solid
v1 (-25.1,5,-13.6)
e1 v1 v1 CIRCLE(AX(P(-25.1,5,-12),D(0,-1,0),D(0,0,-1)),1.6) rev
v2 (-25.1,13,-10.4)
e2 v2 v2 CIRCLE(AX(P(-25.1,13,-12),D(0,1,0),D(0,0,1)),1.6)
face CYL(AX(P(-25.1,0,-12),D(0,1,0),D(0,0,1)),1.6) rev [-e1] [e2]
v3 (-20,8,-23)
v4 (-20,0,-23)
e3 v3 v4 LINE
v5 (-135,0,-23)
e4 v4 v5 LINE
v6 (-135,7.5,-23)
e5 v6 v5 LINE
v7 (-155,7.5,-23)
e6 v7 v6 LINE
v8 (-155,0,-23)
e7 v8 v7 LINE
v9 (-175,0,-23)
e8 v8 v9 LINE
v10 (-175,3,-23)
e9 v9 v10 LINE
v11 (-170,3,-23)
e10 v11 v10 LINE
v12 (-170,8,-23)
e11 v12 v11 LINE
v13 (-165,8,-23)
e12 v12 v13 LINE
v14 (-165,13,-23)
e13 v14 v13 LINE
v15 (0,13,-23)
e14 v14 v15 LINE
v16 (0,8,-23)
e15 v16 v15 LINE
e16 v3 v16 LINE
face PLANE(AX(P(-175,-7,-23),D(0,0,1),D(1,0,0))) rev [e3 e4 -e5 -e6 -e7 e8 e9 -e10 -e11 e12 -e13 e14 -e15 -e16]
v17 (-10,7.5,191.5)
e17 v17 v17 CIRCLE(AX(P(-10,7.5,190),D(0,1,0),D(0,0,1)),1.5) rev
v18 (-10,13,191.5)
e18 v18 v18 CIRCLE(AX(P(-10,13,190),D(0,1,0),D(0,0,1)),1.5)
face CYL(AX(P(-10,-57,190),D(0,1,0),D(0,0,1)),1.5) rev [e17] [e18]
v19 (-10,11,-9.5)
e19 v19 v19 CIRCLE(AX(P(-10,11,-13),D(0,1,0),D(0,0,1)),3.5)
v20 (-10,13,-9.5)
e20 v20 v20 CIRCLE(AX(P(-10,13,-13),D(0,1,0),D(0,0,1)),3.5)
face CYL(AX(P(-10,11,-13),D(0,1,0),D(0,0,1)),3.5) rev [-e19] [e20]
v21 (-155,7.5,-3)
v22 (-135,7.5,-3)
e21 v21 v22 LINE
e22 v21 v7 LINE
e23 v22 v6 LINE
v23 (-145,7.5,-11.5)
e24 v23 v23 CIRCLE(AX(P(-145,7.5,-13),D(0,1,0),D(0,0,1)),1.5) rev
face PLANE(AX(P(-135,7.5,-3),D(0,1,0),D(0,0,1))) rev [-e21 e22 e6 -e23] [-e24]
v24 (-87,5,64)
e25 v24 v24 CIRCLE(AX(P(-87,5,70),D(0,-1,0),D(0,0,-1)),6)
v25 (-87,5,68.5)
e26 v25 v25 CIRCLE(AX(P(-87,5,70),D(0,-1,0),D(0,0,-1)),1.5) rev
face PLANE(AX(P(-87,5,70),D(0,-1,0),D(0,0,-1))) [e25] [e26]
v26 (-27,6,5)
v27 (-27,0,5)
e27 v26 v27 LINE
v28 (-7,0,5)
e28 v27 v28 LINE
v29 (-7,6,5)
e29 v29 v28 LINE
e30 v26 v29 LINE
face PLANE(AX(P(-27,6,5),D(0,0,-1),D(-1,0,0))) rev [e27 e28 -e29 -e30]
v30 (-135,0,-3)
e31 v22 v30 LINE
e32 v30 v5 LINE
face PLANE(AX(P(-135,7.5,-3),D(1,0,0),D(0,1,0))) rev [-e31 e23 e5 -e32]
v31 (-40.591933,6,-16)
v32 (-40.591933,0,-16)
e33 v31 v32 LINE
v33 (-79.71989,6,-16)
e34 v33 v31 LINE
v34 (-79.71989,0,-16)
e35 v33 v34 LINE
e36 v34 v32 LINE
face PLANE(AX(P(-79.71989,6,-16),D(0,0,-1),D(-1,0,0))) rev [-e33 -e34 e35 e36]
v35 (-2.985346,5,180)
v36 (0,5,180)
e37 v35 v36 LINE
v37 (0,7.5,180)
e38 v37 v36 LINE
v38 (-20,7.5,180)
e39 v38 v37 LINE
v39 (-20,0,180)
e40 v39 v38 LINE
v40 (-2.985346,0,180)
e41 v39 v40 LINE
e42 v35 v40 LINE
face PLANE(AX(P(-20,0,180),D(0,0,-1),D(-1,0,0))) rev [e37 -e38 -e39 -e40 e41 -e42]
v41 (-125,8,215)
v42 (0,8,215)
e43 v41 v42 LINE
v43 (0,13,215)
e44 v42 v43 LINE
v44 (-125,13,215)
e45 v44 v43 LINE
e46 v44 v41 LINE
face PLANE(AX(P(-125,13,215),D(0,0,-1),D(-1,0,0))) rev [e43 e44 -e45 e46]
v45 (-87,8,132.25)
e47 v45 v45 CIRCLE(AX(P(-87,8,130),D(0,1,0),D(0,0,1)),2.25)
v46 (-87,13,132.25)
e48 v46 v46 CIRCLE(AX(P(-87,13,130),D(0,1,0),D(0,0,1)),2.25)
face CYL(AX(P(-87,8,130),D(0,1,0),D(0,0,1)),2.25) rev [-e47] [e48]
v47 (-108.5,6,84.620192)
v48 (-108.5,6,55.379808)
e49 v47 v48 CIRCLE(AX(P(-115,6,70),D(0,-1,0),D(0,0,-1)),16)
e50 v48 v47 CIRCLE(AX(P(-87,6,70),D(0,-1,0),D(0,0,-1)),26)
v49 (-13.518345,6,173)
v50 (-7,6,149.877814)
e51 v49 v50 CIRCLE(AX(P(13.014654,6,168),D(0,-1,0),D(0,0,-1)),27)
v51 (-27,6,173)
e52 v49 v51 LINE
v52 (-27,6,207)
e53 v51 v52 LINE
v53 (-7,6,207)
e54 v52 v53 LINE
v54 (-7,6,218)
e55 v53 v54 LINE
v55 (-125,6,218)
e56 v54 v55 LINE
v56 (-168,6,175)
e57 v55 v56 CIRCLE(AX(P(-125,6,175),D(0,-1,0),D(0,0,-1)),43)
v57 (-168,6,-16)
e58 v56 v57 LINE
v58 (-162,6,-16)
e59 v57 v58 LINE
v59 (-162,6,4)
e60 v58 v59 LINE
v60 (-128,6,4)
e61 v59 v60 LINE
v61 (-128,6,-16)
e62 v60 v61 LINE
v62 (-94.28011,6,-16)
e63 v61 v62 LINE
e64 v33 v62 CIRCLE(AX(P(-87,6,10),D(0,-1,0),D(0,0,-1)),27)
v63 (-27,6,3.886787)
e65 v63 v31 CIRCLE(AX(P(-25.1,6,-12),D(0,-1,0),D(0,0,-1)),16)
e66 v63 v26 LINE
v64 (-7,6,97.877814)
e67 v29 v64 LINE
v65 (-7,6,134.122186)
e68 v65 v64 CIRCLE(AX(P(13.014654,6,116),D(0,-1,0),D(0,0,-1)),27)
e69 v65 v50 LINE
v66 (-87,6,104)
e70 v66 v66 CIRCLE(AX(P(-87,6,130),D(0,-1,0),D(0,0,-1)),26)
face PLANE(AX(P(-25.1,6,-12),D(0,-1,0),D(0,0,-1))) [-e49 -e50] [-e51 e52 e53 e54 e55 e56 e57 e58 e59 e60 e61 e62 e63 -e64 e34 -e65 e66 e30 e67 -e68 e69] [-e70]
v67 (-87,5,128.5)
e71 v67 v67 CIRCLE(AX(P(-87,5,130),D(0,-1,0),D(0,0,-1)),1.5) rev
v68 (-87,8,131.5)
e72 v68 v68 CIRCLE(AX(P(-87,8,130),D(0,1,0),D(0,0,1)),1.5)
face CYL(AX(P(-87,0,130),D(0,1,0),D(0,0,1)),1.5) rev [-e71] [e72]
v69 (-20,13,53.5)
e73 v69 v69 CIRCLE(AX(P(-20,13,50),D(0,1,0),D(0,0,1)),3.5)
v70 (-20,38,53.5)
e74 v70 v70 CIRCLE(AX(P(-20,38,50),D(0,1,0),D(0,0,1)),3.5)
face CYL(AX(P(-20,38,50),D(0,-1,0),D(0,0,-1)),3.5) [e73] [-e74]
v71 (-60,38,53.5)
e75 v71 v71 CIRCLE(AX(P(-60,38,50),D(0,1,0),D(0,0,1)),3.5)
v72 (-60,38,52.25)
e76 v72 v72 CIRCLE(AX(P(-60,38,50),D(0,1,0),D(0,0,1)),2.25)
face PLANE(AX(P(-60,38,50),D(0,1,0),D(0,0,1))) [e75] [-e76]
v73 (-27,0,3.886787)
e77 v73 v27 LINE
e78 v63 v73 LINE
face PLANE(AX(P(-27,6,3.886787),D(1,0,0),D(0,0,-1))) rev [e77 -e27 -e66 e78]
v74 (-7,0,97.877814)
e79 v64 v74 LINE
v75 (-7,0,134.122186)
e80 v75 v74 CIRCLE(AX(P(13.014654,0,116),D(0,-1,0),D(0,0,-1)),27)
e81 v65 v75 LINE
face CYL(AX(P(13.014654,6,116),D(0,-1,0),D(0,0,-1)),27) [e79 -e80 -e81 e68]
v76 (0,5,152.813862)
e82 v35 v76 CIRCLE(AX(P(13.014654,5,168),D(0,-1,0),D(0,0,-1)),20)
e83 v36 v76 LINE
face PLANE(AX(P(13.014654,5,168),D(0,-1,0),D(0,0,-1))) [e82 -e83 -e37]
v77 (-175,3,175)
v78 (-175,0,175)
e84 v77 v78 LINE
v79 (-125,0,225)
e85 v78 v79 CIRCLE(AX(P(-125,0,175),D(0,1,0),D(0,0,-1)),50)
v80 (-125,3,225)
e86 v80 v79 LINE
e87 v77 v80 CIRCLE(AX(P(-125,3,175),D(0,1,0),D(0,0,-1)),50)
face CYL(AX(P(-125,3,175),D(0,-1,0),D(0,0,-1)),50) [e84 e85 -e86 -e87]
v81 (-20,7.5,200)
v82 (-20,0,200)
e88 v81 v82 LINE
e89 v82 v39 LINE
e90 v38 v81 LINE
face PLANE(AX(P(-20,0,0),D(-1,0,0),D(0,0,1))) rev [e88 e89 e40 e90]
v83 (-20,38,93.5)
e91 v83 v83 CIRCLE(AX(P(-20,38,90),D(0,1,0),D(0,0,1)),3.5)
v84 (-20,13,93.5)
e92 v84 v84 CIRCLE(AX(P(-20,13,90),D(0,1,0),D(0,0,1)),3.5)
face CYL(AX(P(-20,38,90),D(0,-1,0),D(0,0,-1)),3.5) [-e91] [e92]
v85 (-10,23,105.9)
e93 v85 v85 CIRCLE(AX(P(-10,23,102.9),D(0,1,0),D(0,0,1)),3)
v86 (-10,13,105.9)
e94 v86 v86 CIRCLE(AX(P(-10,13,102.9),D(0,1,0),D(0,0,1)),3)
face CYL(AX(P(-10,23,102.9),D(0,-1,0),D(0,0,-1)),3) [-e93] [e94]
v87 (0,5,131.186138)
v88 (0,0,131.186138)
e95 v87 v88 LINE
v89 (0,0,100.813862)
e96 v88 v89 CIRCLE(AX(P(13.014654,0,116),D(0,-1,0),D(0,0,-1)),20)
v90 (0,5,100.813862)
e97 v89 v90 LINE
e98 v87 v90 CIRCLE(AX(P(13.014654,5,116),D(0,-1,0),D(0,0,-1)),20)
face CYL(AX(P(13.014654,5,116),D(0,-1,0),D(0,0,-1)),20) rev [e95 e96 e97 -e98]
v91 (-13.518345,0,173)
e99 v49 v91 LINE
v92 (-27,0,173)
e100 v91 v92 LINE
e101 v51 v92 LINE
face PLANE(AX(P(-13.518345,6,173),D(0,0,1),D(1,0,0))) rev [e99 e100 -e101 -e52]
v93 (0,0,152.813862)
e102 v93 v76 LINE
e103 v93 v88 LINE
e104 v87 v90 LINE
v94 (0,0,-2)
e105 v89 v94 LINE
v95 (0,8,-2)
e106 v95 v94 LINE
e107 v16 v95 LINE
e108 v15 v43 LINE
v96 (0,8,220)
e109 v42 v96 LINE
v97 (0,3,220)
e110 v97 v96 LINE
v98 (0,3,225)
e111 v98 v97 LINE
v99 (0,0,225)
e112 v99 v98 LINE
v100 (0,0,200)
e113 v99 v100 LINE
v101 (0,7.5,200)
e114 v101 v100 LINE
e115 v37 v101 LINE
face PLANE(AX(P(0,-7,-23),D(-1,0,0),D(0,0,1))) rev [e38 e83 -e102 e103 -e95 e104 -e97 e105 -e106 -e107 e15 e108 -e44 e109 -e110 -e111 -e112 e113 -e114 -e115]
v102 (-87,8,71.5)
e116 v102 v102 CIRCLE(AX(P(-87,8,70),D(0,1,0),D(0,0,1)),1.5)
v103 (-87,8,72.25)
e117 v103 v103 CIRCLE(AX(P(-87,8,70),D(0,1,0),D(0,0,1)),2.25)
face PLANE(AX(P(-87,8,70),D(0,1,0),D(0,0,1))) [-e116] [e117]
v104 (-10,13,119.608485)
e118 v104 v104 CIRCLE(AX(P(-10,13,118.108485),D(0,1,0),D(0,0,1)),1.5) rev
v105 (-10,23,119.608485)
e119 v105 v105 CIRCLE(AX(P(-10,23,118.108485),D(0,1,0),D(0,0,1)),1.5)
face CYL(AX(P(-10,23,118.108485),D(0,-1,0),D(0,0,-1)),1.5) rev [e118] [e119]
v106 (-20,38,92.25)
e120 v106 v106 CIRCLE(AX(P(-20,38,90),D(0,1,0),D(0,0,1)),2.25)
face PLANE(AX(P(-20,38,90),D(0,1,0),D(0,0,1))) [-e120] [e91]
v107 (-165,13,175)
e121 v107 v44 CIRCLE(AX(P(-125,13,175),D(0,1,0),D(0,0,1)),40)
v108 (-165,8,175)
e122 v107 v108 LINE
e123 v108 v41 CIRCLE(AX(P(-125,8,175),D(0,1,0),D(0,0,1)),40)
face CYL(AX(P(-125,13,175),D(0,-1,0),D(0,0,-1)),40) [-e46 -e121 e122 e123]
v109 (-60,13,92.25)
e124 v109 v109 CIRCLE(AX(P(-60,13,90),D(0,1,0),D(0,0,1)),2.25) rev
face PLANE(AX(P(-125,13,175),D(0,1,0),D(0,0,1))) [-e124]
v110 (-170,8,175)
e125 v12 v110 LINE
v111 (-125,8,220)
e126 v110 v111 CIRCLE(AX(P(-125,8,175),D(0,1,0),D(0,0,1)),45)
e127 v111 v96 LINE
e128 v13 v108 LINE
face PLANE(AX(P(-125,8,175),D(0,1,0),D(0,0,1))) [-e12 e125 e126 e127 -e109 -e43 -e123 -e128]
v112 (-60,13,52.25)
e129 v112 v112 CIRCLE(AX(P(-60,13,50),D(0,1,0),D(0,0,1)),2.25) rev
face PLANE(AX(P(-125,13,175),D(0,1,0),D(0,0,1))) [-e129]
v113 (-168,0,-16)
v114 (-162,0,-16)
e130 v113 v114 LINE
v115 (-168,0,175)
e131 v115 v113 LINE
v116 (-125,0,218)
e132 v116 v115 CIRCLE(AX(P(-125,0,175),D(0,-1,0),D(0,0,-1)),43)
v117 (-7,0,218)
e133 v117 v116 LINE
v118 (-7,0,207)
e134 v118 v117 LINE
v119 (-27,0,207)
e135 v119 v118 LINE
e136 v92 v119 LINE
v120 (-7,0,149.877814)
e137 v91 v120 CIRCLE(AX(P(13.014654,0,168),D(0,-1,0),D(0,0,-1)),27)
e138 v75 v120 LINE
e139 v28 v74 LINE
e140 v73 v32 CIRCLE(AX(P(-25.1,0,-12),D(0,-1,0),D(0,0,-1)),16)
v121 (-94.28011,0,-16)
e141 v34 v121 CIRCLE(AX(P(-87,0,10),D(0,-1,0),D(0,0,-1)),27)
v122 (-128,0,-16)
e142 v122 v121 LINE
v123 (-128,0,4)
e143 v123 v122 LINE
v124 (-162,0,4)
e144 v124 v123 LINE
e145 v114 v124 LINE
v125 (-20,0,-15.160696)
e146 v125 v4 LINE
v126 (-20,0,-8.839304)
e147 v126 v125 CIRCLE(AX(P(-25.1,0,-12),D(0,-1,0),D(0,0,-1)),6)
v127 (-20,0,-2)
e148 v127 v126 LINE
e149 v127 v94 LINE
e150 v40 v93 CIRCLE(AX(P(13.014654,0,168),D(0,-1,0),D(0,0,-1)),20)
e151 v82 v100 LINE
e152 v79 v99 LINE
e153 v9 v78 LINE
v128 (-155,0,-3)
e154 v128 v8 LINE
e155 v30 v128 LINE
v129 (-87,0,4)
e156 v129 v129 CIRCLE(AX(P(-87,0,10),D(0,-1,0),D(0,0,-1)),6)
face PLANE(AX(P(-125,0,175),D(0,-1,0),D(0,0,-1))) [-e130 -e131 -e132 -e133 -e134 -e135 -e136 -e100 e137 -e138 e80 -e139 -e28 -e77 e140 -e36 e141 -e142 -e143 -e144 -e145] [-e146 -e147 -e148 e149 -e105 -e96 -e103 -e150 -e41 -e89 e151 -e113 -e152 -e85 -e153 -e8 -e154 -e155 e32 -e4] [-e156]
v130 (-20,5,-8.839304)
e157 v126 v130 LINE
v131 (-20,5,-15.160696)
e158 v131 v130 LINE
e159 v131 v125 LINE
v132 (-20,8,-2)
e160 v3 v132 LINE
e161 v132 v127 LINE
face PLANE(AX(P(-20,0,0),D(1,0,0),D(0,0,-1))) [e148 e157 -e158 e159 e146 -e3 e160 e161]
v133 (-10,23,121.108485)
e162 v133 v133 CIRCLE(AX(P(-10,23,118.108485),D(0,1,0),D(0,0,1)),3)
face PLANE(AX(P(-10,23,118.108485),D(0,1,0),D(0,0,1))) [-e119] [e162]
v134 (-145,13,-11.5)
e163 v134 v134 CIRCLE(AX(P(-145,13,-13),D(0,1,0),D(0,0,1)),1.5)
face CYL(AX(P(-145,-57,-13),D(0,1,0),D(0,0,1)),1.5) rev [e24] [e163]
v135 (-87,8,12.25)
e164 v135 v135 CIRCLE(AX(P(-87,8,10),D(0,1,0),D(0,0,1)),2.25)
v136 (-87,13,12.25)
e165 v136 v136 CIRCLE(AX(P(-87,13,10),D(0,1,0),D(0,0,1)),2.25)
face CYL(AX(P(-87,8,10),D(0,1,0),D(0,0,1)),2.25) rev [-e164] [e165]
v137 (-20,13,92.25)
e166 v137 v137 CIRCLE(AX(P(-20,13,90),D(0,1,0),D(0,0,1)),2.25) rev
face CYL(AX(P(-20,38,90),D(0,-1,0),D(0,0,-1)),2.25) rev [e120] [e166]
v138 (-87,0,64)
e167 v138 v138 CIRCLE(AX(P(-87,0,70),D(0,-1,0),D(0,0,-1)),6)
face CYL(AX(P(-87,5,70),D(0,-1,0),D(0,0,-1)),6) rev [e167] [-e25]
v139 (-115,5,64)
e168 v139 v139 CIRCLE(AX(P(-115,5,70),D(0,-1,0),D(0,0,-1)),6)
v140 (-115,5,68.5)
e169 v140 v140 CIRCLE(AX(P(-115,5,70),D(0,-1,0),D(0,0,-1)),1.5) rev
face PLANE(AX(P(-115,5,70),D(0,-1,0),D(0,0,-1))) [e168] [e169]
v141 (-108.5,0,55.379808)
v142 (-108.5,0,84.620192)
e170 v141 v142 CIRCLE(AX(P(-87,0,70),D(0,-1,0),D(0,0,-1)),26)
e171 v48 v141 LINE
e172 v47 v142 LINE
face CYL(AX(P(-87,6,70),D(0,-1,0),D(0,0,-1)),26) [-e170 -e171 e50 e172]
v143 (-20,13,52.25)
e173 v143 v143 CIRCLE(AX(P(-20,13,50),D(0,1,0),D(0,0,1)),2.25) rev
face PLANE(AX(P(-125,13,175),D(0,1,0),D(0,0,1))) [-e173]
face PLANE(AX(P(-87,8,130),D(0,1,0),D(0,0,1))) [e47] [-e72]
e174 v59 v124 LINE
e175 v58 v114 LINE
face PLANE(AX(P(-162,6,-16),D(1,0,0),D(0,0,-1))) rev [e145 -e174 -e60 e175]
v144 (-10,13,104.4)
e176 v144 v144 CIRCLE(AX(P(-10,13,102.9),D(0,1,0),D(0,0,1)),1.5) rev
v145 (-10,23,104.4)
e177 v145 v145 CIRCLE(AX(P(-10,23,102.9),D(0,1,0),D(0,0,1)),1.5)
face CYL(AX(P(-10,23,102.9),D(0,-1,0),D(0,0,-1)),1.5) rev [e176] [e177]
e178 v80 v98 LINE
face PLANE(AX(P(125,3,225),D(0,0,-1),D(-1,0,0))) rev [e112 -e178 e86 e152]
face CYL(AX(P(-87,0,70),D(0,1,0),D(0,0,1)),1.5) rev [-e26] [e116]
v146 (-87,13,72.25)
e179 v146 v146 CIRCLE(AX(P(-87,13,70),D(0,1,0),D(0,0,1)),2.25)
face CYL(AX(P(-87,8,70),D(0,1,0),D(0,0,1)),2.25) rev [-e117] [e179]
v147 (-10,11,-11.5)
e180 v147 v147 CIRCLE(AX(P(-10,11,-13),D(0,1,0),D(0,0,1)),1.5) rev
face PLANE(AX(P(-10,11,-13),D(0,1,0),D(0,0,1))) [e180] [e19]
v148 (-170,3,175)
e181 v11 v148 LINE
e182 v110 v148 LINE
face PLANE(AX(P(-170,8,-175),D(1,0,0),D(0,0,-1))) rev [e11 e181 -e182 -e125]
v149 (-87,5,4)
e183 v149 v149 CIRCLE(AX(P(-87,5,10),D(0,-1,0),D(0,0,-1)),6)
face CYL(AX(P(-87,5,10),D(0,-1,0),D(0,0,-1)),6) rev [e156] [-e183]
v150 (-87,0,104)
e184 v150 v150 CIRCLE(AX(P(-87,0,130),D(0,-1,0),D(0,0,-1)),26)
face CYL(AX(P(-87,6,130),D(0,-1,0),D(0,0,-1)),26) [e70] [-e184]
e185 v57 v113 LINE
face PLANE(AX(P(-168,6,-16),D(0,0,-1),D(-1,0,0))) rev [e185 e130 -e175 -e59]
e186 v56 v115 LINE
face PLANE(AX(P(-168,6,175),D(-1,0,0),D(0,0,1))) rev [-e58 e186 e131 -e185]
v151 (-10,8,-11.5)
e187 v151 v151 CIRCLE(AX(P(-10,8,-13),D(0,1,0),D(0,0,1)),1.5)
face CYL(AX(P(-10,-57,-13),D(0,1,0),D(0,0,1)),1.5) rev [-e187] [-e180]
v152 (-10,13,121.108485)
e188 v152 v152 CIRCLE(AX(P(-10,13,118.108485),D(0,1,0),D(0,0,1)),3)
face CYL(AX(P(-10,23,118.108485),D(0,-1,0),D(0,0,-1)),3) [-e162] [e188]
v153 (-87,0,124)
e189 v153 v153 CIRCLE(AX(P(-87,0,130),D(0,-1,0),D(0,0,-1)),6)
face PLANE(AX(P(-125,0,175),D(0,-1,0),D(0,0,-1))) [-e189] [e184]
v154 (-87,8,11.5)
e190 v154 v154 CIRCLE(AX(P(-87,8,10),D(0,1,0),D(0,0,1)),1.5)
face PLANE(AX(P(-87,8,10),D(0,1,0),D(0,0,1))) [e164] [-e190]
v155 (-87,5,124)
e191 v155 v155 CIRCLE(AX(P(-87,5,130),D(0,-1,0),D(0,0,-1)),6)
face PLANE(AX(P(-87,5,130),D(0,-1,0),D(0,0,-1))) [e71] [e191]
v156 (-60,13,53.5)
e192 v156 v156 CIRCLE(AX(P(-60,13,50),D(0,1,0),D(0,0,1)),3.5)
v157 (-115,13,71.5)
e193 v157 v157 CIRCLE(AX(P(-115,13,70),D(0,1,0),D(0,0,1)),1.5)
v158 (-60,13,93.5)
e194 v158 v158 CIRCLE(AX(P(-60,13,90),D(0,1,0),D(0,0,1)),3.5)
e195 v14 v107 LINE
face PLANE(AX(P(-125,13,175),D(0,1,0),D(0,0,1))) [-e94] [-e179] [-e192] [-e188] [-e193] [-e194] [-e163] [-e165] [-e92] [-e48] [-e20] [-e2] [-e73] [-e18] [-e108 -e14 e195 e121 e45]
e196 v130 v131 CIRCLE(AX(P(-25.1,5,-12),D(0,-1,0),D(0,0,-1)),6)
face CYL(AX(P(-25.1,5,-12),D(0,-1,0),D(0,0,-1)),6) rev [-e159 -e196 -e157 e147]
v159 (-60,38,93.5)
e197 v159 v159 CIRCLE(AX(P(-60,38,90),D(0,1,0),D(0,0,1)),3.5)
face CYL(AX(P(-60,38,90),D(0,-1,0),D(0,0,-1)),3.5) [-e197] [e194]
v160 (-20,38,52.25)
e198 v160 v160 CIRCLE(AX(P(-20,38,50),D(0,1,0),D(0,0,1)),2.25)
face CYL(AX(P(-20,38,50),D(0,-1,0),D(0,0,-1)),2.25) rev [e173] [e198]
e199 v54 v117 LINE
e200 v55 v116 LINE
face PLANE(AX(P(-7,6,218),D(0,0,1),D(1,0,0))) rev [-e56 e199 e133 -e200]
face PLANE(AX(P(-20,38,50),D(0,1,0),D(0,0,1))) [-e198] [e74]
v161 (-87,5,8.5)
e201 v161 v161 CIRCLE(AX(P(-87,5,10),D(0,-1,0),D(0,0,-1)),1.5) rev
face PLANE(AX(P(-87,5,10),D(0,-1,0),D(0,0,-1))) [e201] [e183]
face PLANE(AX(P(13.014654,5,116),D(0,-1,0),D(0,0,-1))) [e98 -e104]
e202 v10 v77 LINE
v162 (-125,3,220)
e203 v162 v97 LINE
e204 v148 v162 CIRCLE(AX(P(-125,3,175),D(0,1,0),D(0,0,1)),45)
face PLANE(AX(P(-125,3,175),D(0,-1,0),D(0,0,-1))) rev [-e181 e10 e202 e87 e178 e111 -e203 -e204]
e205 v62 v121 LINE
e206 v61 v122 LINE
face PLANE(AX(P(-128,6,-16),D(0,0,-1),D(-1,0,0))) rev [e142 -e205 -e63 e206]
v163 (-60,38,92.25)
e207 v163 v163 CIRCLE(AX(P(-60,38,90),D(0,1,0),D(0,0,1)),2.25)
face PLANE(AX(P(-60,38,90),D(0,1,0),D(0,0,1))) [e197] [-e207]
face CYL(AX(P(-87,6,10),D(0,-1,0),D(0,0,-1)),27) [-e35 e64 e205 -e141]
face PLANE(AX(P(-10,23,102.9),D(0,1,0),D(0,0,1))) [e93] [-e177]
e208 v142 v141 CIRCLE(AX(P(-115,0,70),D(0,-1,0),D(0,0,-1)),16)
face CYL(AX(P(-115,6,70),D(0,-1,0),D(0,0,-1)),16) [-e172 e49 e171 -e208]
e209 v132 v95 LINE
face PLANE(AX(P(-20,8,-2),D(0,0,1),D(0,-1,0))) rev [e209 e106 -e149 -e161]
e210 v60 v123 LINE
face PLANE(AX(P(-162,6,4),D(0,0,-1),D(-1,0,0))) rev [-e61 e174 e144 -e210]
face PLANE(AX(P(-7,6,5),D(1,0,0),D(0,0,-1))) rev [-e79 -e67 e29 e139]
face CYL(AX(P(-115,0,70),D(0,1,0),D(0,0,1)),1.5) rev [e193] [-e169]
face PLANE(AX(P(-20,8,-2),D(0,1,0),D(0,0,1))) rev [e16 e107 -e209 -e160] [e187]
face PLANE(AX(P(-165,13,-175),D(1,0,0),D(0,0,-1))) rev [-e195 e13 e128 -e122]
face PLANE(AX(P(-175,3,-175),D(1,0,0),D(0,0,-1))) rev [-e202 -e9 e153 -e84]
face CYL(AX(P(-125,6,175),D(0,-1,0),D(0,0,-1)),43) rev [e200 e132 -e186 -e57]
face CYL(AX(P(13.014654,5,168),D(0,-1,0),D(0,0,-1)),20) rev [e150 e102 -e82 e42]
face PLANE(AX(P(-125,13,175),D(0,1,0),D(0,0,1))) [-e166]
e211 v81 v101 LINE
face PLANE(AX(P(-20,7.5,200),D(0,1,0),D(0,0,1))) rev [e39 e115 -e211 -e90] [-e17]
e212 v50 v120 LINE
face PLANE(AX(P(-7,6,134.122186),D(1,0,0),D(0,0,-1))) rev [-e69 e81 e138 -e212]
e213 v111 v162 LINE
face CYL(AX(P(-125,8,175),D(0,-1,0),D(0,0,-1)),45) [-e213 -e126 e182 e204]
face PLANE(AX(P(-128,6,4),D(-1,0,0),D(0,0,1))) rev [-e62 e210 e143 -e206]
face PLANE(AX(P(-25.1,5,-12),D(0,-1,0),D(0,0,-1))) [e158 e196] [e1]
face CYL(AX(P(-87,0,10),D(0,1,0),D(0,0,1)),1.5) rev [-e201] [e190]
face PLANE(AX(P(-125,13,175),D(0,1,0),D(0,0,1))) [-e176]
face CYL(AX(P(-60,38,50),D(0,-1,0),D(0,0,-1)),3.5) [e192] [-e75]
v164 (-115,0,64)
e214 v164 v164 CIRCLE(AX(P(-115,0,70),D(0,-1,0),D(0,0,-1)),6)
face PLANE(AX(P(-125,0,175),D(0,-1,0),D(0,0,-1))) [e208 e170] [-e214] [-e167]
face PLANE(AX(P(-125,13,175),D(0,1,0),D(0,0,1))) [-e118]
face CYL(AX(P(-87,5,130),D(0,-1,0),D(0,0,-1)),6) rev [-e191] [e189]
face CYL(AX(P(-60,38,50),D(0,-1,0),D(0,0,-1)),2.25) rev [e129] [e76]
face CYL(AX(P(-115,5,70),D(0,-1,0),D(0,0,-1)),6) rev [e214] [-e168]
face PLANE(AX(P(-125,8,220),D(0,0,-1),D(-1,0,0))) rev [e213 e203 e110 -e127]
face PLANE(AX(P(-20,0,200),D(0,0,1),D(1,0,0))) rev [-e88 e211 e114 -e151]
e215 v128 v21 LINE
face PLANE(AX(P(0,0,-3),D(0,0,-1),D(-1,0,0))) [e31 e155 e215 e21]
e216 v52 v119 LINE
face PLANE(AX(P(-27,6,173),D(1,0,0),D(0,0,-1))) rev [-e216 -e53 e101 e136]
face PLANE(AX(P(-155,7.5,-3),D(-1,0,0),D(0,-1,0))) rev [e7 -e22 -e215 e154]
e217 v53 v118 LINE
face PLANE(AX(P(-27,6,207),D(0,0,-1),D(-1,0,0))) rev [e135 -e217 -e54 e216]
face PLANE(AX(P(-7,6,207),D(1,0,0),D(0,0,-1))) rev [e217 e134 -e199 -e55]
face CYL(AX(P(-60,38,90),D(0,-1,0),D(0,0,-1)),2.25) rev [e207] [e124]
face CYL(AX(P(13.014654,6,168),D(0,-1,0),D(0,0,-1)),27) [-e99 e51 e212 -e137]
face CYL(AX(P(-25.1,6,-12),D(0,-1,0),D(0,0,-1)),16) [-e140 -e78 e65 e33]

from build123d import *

# Parameters (mm, degrees)
SALIENTE_EXTRUIR1_DEPTH = 3
SALIENTE_EXTRUIR2_DEPTH = 5
SALIENTE_EXTRUIR3_DEPTH = 5
CROQUIS6_R              = 2.25
CORTAR_EXTRUIR3_DEPTH   = 5
CROQUIS7_R              = 1.5
CORTAR_EXTRUIR4_DEPTH   = 286.340147894
CORTAR_EXTRUIR5_DEPTH   = 8
CROQUIS9_R              = 1.5
CORTAR_EXTRUIR6_DEPTH   = 286.340147894
CROQUIS10_W             = 25
CROQUIS10_H             = 50
CORTAR_EXTRUIR7_DEPTH   = 5
CHAFL_N1_SIZE           = 5
CROQUIS13_R             = 3.5
CROQUIS13_R_2           = 2.25
SALIENTE_EXTRUIR4_DEPTH = 25
CROQUIS14_R             = 3
CROQUIS14_R_2           = 1.25
CROQUIS14_R_3           = 1.5
SALIENTE_EXTRUIR5_DEPTH = 10
CROQUIS12_R             = 1.6
CORTAR_EXTRUIR9_DEPTH   = 287.138078556
CROQUIS11_R             = 6
CORTAR_EXTRUIR8_DEPTH   = 5
CROQUIS16_W             = 40
CROQUIS16_H             = 8
CORTAR_EXTRUIR10_DEPTH  = 20
CORTAR_EXTRUIR11_DEPTH  = 20
CROQUIS19_R             = 1.5
CORTAR_EXTRUIR12_DEPTH  = 70
CROQUIS20_W             = 20
CROQUIS20_H             = 7.5
CORTAR_EXTRUIR13_DEPTH  = 20
CROQUIS21_W             = 20
CROQUIS21_H             = 7.5
CORTAR_EXTRUIR14_DEPTH  = 20
CROQUIS23_R             = 3.5
CORTAR_EXTRUIR16_DEPTH  = 2
CROQUIS22_R             = 26
CORTAR_EXTRUIR17_DEPTH  = 6


with BuildPart() as part:
    # Croquis1 → Saliente-Extruir1 (new body)
    with BuildSketch(Plane(origin=(0, 0, 0), x_dir=(1, 0, 0), z_dir=(0, 1, 0))):
        with BuildLine():
            Line((125, 225), (-125, 225))
            ThreePointArc((-125, 225), (-160.355339059, 210.355339059), (-175, 175))
            Line((-175, 175), (-175, -175))
            ThreePointArc((-175, -175), (-160.355339059, -210.355339059), (-125, -225))
            Line((-125, -225), (125, -225))
            ThreePointArc((125, -225), (160.355339059, -210.355339059), (175, -175))
            Line((175, -175), (175, 175))
            ThreePointArc((175, 175), (160.355339059, 210.355339059), (125, 225))
        make_face()
    extrude(amount=SALIENTE_EXTRUIR1_DEPTH)

    # Croquis2 → Saliente-Extruir2 (add)
    with BuildSketch(Plane(origin=(0, 3, 0), x_dir=(1, 0, 0), z_dir=(0, 1, 0))):
        with BuildLine():
            Line((-125, -220), (125, -220))
            ThreePointArc((125, -220), (156.819805153, -206.819805153), (170, -175))
            Line((170, -175), (170, 175))
            ThreePointArc((170, 175), (156.819805153, 206.819805153), (125, 220))
            Line((125, 220), (-125, 220))
            ThreePointArc((-125, 220), (-156.819805153, 206.819805153), (-170, 175))
            Line((-170, 175), (-170, -175))
            ThreePointArc((-170, -175), (-156.819805153, -206.819805153), (-125, -220))
        make_face()
    extrude(amount=SALIENTE_EXTRUIR2_DEPTH)

    # Croquis3 → Saliente-Extruir3 (add)
    with BuildSketch(Plane(origin=(0, 8, 0), x_dir=(1, 0, 0), z_dir=(0, 1, 0))):
        with BuildLine():
            Line((-125, -215), (125, -215))
            ThreePointArc((125, -215), (153.284271247, -203.284271247), (165, -175))
            Line((165, -175), (165, 175))
            ThreePointArc((165, 175), (153.284271247, 203.284271247), (125, 215))
            Line((125, 215), (-125, 215))
            ThreePointArc((-125, 215), (-153.284271247, 203.284271247), (-165, 175))
            Line((-165, 175), (-165, -175))
            ThreePointArc((-165, -175), (-153.284271247, -203.284271247), (-125, -215))
        make_face()
    extrude(amount=SALIENTE_EXTRUIR3_DEPTH)

    # Croquis6 → Cortar-Extruir3 (cut)
    with BuildSketch(Plane(origin=(0, 13, 0), x_dir=(1, 0, 0), z_dir=(0, 1, 0))):
        with Locations(Location((-87, -130, 0), (0, 0, 270))):
            Circle(CROQUIS6_R)
        with Locations(Location((-87, -70, 0), (0, 0, 270))):
            Circle(CROQUIS6_R)
        with Locations(Location((-87, -10, 0), (0, 0, 270))):
            Circle(CROQUIS6_R)
        with Locations(Location((87, -130, 0), (0, 0, 90))):
            Circle(CROQUIS6_R)
        with Locations(Location((87, -70, 0), (0, 0, 90))):
            Circle(CROQUIS6_R)
        with Locations(Location((87, -10, 0), (0, 0, 90))):
            Circle(CROQUIS6_R)
    extrude(amount=-CORTAR_EXTRUIR3_DEPTH, mode=Mode.SUBTRACT)

    # Croquis7 → Cortar-Extruir4 (cut, through all)
    with BuildSketch(Plane(origin=(0, 13, 0), x_dir=(1, 0, 0), z_dir=(0, 1, 0))):
        with Locations(Location((-115, -70, 0), (0, 0, 270))):
            Circle(CROQUIS7_R)
        with Locations(Location((-115, 130, 0), (0, 0, 270))):
            Circle(CROQUIS7_R)
        with Locations(Location((115, -70, 0), (0, 0, 90))):
            Circle(CROQUIS7_R)
        with Locations(Location((115, 130, 0), (0, 0, 90))):
            Circle(CROQUIS7_R)
    extrude(amount=-CORTAR_EXTRUIR4_DEPTH, mode=Mode.SUBTRACT)

    # Croquis8 → Cortar-Extruir5 (cut)
    with BuildSketch(Plane(origin=(0, 13, 0), x_dir=(1, 0, 0), z_dir=(0, 1, 0))):
        with BuildLine():
            Line((16.014653583, -158), (16.014653583, -178))
            ThreePointArc((16.014653583, -178), (13.014653583, -181), (10.014653583, -178))
            Line((10.014653583, -178), (10.014653583, -158))
            ThreePointArc((10.014653583, -158), (13.014653583, -155), (16.014653583, -158))
        make_face()
        with BuildLine():
            Line((28.014653583, -158), (28.014653583, -178))
            ThreePointArc((28.014653583, -178), (25.014653583, -181), (22.014653583, -178))
            Line((22.014653583, -178), (22.014653583, -158))
            ThreePointArc((22.014653583, -158), (25.014653583, -155), (28.014653583, -158))
        make_face()
        with BuildLine():
            Line((28.014653583, -106), (28.014653583, -126))
            ThreePointArc((28.014653583, -126), (25.014653583, -129), (22.014653583, -126))
            Line((22.014653583, -126), (22.014653583, -106))
            ThreePointArc((22.014653583, -106), (25.014653583, -103), (28.014653583, -106))
        make_face()
        with BuildLine():
            Line((16.014653583, -106), (16.014653583, -126))
            ThreePointArc((16.014653583, -126), (13.014653583, -129), (10.014653583, -126))
            Line((10.014653583, -126), (10.014653583, -106))
            ThreePointArc((10.014653583, -106), (13.014653583, -103), (16.014653583, -106))
        make_face()
    extrude(amount=-CORTAR_EXTRUIR5_DEPTH, mode=Mode.SUBTRACT)

    # Croquis9 → Cortar-Extruir6 (cut, through all)
    with BuildSketch(Plane(origin=(0, 13, 0), x_dir=(1, 0, 0), z_dir=(0, 1, 0))):
        with Locations(Location((13.014653583, -168, 0), (0, 0, 270))):
            Circle(CROQUIS9_R)
        with Locations(Location((25.014653583, -168, 0), (0, 0, 270))):
            Circle(CROQUIS9_R)
        with Locations(Location((13.014653583, -116, 0), (0, 0, 270))):
            Circle(CROQUIS9_R)
        with Locations(Location((25.014653583, -116, 0), (0, 0, 270))):
            Circle(CROQUIS9_R)
        with Locations(Location((-87, -130, 0), (0, 0, 270))):
            Circle(CROQUIS9_R)
        with Locations(Location((-87, -70, 0), (0, 0, 270))):
            Circle(CROQUIS9_R)
        with Locations(Location((-87, -10, 0), (0, 0, 270))):
            Circle(CROQUIS9_R)
        with Locations(Location((87, -10, 0), (0, 0, 270))):
            Circle(CROQUIS9_R)
        with Locations(Location((87, -70, 0), (0, 0, 270))):
            Circle(CROQUIS9_R)
        with Locations(Location((87, -130, 0), (0, 0, 270))):
            Circle(CROQUIS9_R)
    extrude(amount=-CORTAR_EXTRUIR6_DEPTH, mode=Mode.SUBTRACT)

    # Croquis10 → Cortar-Extruir7 (cut)
    with BuildSketch(Plane(origin=(0, 13, 0), x_dir=(1, 0, 0), z_dir=(0, 1, 0))):
        with Locations((62.5, -145)):
            Rectangle(CROQUIS10_W, CROQUIS10_H)
    extrude(amount=-CORTAR_EXTRUIR7_DEPTH, mode=Mode.SUBTRACT)

    # Chaflán1
    chafl_n1_edges = [part.edges().sort_by_distance(p)[0] for p in [
        (62.5, 13, 120),
        (50, 13, 145),
        (62.5, 13, 170),
        (75, 13, 145),
    ]]
    chamfer(chafl_n1_edges, length=CHAFL_N1_SIZE - 0.0001)  # a hair under: the kernel refuses the full size

    # Croquis13 → Saliente-Extruir4 (add)
    # profile 1 of 4: a face of its own
    with BuildSketch(Plane(origin=(0, 13, 0), x_dir=(1, 0, 0), z_dir=(0, 1, 0))):
        with Locations(Location((-20, -50, 0), (0, 0, 270))):
            Circle(CROQUIS13_R)
        with Locations(Location((-20, -50, 0), (0, 0, 270))):
            Circle(CROQUIS13_R_2, mode=Mode.SUBTRACT)
    # profile 2 of 4: a face of its own
    with BuildSketch(Plane(origin=(0, 13, 0), x_dir=(1, 0, 0), z_dir=(0, 1, 0))):
        with Locations(Location((-60, -50, 0), (0, 0, 270))):
            Circle(CROQUIS13_R)
        with Locations(Location((-60, -50, 0), (0, 0, 270))):
            Circle(CROQUIS13_R_2, mode=Mode.SUBTRACT)
    # profile 3 of 4: a face of its own
    with BuildSketch(Plane(origin=(0, 13, 0), x_dir=(1, 0, 0), z_dir=(0, 1, 0))):
        with Locations(Location((-60, -90, 0), (0, 0, 270))):
            Circle(CROQUIS13_R)
        with Locations(Location((-60, -90, 0), (0, 0, 270))):
            Circle(CROQUIS13_R_2, mode=Mode.SUBTRACT)
    # profile 4 of 4: a face of its own
    with BuildSketch(Plane(origin=(0, 13, 0), x_dir=(1, 0, 0), z_dir=(0, 1, 0))):
        with Locations(Location((-20, -90, 0), (0, 0, 270))):
            Circle(CROQUIS13_R)
        with Locations(Location((-20, -90, 0), (0, 0, 270))):
            Circle(CROQUIS13_R_2, mode=Mode.SUBTRACT)
    extrude(amount=SALIENTE_EXTRUIR4_DEPTH)

    # Croquis14 → Saliente-Extruir5 (add)
    # profile 1 of 6: a face of its own
    with BuildSketch(Plane(origin=(0, 13, 0), x_dir=(1, 0, 0), z_dir=(0, 1, 0))):
        with Locations(Location((67.55, -40, 0), (0, 0, 270))):
            Circle(CROQUIS14_R)
        with Locations(Location((67.55, -40, 0), (0, 0, 270))):
            Circle(CROQUIS14_R_2, mode=Mode.SUBTRACT)
    # profile 2 of 6: a face of its own
    with BuildSketch(Plane(origin=(0, 13, 0), x_dir=(1, 0, 0), z_dir=(0, 1, 0))):
        with Locations(Location((3.15, -40, 0), (0, 0, 270))):
            Circle(CROQUIS14_R)
        with Locations(Location((3.15, -40, 0), (0, 0, 270))):
            Circle(CROQUIS14_R_2, mode=Mode.SUBTRACT)
    # profile 3 of 6: a face of its own
    with BuildSketch(Plane(origin=(0, 13, 0), x_dir=(1, 0, 0), z_dir=(0, 1, 0))):
        with Locations(Location((3, -91.9, 0), (0, 0, 270))):
            Circle(CROQUIS14_R)
        with Locations(Location((3, -91.9, 0), (0, 0, 270))):
            Circle(CROQUIS14_R_2, mode=Mode.SUBTRACT)
    # profile 4 of 6: a face of its own
    with BuildSketch(Plane(origin=(0, 13, 0), x_dir=(1, 0, 0), z_dir=(0, 1, 0))):
        with Locations(Location((67.4, -91.9, 0), (0, 0, 270))):
            Circle(CROQUIS14_R)
        with Locations(Location((67.4, -91.9, 0), (0, 0, 270))):
            Circle(CROQUIS14_R_2, mode=Mode.SUBTRACT)
    # profile 5 of 6: a face of its own
    with BuildSketch(Plane(origin=(0, 13, 0), x_dir=(1, 0, 0), z_dir=(0, 1, 0))):
        with Locations(Location((-10, -102.9, 0), (0, 0, 270))):
            Circle(CROQUIS14_R)
        with Locations(Location((-10, -102.9, 0), (0, 0, 270))):
            Circle(CROQUIS14_R_3, mode=Mode.SUBTRACT)
    # profile 6 of 6: a face of its own
    with BuildSketch(Plane(origin=(0, 13, 0), x_dir=(1, 0, 0), z_dir=(0, 1, 0))):
        with Locations(Location((-10, -118.108484849, 0), (0, 0, 270))):
            Circle(CROQUIS14_R)
        with Locations(Location((-10, -118.108484849, 0), (0, 0, 270))):
            Circle(CROQUIS14_R_3, mode=Mode.SUBTRACT)
    extrude(amount=SALIENTE_EXTRUIR5_DEPTH)

    # Croquis12 → Cortar-Extruir9 (cut, through all)
    with BuildSketch(Plane(origin=(0, 13, 0), x_dir=(1, 0, 0), z_dir=(0, 1, 0))):
        with Locations(Location((-25.1, 162.2, 0), (0, 0, 270))):
            Circle(CROQUIS12_R)
        with Locations(Location((25.1, 162.2, 0), (0, 0, 270))):
            Circle(CROQUIS12_R)
        with Locations(Location((-25.1, 12, 0), (0, 0, 270))):
            Circle(CROQUIS12_R)
        with Locations(Location((25.1, 12, 0), (0, 0, 270))):
            Circle(CROQUIS12_R)
    extrude(amount=-CORTAR_EXTRUIR9_DEPTH, mode=Mode.SUBTRACT)

    # Croquis11 → Cortar-Extruir8 (cut)
    with BuildSketch(Plane.XZ):
        with Locations(Location((87, 130, 0), (0, 0, 270))):
            Circle(CROQUIS11_R)
        with Locations(Location((87, 70, 0), (0, 0, 270))):
            Circle(CROQUIS11_R)
        with Locations(Location((87, 10, 0), (0, 0, 270))):
            Circle(CROQUIS11_R)
        with Locations(Location((-87, 10, 0), (0, 0, 270))):
            Circle(CROQUIS11_R)
        with Locations(Location((-87, 70, 0), (0, 0, 270))):
            Circle(CROQUIS11_R)
        with Locations(Location((-87, 130, 0), (0, 0, 270))):
            Circle(CROQUIS11_R)
        with Locations(Location((-115, 70, 0), (0, 0, 270))):
            Circle(CROQUIS11_R)
        with Locations(Location((115, 70, 0), (0, 0, 270))):
            Circle(CROQUIS11_R)
        with Locations(Location((115, -130, 0), (0, 0, 270))):
            Circle(CROQUIS11_R)
        with Locations(Location((-115, -130, 0), (0, 0, 270))):
            Circle(CROQUIS11_R)
        with Locations(Location((-25.1, -162.2, 0), (0, 0, 270))):
            Circle(CROQUIS11_R)
        with Locations(Location((25.1, -162.2, 0), (0, 0, 270))):
            Circle(CROQUIS11_R)
        with Locations(Location((-25.1, -12, 0), (0, 0, 270))):
            Circle(CROQUIS11_R)
        with Locations(Location((25.1, -12, 0), (0, 0, 270))):
            Circle(CROQUIS11_R)
        with BuildLine():
            Line((13.014653583, 188), (25.014653583, 188))
            ThreePointArc((25.014653583, 188), (45.014653583, 168), (25.014653583, 148))
            Line((25.014653583, 148), (13.014653583, 148))
            ThreePointArc((13.014653583, 148), (-6.985346417, 168), (13.014653583, 188))
        make_face()
        with BuildLine():
            Line((13.014653583, 136), (25.014653583, 136))
            ThreePointArc((25.014653583, 136), (45.014653583, 116), (25.014653583, 96))
            Line((25.014653583, 96), (13.014653583, 96))
            ThreePointArc((13.014653583, 96), (-6.985346417, 116), (13.014653583, 136))
        make_face()
    extrude(amount=-CORTAR_EXTRUIR8_DEPTH, mode=Mode.SUBTRACT)

    # Croquis16 → Cortar-Extruir10 (cut, symmetric)
    with BuildSketch(Plane(origin=(0, 0, 0), x_dir=(0, 0, -1), z_dir=(1, 0, 0))):
        with Locations((22, 4)):
            Rectangle(CROQUIS16_W, CROQUIS16_H)
    extrude(amount=CORTAR_EXTRUIR10_DEPTH, both=True, mode=Mode.SUBTRACT)

    # Croquis17 → Cortar-Extruir11 (cut, symmetric)
    with BuildSketch(Plane(origin=(0, 13, 0), x_dir=(1, 0, 0), z_dir=(0, 1, 0))):
        Polygon((-175, 23), (0, 23), (0, -225), (175, -225), (175, 225), (-175, 225), align=None)
    extrude(amount=CORTAR_EXTRUIR11_DEPTH, both=True, mode=Mode.SUBTRACT)

    # Croquis19 → Cortar-Extruir12 (cut)
    with BuildSketch(Plane(origin=(0, 13, 0), x_dir=(1, 0, 0), z_dir=(0, 1, 0))):
        with Locations(Location((-145, 13, 0), (0, 0, 270))):
            Circle(CROQUIS19_R)
        with Locations(Location((-10, -190, 0), (0, 0, 270))):
            Circle(CROQUIS19_R)
        with Locations(Location((-10, 13, 0), (0, 0, 270))):
            Circle(CROQUIS19_R)
    extrude(amount=-CORTAR_EXTRUIR12_DEPTH, mode=Mode.SUBTRACT)

    # Croquis20 → Cortar-Extruir13 (cut)
    with BuildSketch(Plane(origin=(0, 0, 0), x_dir=(0, 0, -1), z_dir=(1, 0, 0))):
        with Locations((-190, 3.75)):
            Rectangle(CROQUIS20_W, CROQUIS20_H)
    extrude(amount=-CORTAR_EXTRUIR13_DEPTH, mode=Mode.SUBTRACT)

    # Croquis21 → Cortar-Extruir14 (cut)
    with BuildSketch(Plane(origin=(0, 0, -23), x_dir=(-1, 0, 0), z_dir=(0, 0, -1))):
        with Locations((145, 3.75)):
            Rectangle(CROQUIS21_W, CROQUIS21_H)
    extrude(amount=-CORTAR_EXTRUIR14_DEPTH, mode=Mode.SUBTRACT)

    # Croquis23 → Cortar-Extruir16 (cut)
    with BuildSketch(Plane(origin=(0, 13, 0), x_dir=(1, 0, 0), z_dir=(0, 1, 0))):
        with Locations(Location((-10, 13, 0), (0, 0, 270))):
            Circle(CROQUIS23_R)
    extrude(amount=-CORTAR_EXTRUIR16_DEPTH, mode=Mode.SUBTRACT)

    # Croquis22 → Cortar-Extruir17 (cut)
    with BuildSketch(Plane.XZ):
        with BuildLine():
            Line((-27, 3.886786963), (-27, 5))
            Line((-27, 5), (-7, 5))
            Line((-7, 5), (-7, 97.877813544))
            ThreePointArc((-7, 97.877813544), (-13.985346417, 116), (-7, 134.122186456))
            Line((-7, 134.122186456), (-7, 149.877813544))
            ThreePointArc((-7, 149.877813544), (-12.972455743, 160.674008676), (-13.51834474, 173))
            Line((-13.51834474, 173), (-27, 173))
            Line((-27, 173), (-27, 207))
            Line((-27, 207), (-7, 207))
            Line((-7, 207), (-7, 218))
            Line((-7, 218), (-125, 218))
            ThreePointArc((-125, 218), (-155.405591591, 205.405591591), (-168, 175))
            Line((-168, 175), (-168, -16))
            Line((-168, -16), (-162, -16))
            Line((-162, -16), (-162, 4))
            Line((-162, 4), (-128, 4))
            Line((-128, 4), (-128, -16))
            Line((-128, -16), (-94.280109889, -16))
            ThreePointArc((-94.280109889, -16), (-87, 37), (-79.719890111, -16))
            Line((-79.719890111, -16), (-40.591933385, -16))
            ThreePointArc((-40.591933385, -16), (-38.309500772, -2.971761558), (-27, 3.886786963))
        make_face()
        with Locations(Location((-87, 130, 0), (0, 0, 270))):
            Circle(CROQUIS22_R, mode=Mode.SUBTRACT)
        with BuildLine():
            ThreePointArc((-108.5, 84.620191517), (-131, 70), (-108.5, 55.379808483))
            ThreePointArc((-108.5, 55.379808483), (-61, 70), (-108.5, 84.620191517))
        make_face(mode=Mode.SUBTRACT)
    extrude(amount=-CORTAR_EXTRUIR17_DEPTH, mode=Mode.SUBTRACT)


solid = part.part
